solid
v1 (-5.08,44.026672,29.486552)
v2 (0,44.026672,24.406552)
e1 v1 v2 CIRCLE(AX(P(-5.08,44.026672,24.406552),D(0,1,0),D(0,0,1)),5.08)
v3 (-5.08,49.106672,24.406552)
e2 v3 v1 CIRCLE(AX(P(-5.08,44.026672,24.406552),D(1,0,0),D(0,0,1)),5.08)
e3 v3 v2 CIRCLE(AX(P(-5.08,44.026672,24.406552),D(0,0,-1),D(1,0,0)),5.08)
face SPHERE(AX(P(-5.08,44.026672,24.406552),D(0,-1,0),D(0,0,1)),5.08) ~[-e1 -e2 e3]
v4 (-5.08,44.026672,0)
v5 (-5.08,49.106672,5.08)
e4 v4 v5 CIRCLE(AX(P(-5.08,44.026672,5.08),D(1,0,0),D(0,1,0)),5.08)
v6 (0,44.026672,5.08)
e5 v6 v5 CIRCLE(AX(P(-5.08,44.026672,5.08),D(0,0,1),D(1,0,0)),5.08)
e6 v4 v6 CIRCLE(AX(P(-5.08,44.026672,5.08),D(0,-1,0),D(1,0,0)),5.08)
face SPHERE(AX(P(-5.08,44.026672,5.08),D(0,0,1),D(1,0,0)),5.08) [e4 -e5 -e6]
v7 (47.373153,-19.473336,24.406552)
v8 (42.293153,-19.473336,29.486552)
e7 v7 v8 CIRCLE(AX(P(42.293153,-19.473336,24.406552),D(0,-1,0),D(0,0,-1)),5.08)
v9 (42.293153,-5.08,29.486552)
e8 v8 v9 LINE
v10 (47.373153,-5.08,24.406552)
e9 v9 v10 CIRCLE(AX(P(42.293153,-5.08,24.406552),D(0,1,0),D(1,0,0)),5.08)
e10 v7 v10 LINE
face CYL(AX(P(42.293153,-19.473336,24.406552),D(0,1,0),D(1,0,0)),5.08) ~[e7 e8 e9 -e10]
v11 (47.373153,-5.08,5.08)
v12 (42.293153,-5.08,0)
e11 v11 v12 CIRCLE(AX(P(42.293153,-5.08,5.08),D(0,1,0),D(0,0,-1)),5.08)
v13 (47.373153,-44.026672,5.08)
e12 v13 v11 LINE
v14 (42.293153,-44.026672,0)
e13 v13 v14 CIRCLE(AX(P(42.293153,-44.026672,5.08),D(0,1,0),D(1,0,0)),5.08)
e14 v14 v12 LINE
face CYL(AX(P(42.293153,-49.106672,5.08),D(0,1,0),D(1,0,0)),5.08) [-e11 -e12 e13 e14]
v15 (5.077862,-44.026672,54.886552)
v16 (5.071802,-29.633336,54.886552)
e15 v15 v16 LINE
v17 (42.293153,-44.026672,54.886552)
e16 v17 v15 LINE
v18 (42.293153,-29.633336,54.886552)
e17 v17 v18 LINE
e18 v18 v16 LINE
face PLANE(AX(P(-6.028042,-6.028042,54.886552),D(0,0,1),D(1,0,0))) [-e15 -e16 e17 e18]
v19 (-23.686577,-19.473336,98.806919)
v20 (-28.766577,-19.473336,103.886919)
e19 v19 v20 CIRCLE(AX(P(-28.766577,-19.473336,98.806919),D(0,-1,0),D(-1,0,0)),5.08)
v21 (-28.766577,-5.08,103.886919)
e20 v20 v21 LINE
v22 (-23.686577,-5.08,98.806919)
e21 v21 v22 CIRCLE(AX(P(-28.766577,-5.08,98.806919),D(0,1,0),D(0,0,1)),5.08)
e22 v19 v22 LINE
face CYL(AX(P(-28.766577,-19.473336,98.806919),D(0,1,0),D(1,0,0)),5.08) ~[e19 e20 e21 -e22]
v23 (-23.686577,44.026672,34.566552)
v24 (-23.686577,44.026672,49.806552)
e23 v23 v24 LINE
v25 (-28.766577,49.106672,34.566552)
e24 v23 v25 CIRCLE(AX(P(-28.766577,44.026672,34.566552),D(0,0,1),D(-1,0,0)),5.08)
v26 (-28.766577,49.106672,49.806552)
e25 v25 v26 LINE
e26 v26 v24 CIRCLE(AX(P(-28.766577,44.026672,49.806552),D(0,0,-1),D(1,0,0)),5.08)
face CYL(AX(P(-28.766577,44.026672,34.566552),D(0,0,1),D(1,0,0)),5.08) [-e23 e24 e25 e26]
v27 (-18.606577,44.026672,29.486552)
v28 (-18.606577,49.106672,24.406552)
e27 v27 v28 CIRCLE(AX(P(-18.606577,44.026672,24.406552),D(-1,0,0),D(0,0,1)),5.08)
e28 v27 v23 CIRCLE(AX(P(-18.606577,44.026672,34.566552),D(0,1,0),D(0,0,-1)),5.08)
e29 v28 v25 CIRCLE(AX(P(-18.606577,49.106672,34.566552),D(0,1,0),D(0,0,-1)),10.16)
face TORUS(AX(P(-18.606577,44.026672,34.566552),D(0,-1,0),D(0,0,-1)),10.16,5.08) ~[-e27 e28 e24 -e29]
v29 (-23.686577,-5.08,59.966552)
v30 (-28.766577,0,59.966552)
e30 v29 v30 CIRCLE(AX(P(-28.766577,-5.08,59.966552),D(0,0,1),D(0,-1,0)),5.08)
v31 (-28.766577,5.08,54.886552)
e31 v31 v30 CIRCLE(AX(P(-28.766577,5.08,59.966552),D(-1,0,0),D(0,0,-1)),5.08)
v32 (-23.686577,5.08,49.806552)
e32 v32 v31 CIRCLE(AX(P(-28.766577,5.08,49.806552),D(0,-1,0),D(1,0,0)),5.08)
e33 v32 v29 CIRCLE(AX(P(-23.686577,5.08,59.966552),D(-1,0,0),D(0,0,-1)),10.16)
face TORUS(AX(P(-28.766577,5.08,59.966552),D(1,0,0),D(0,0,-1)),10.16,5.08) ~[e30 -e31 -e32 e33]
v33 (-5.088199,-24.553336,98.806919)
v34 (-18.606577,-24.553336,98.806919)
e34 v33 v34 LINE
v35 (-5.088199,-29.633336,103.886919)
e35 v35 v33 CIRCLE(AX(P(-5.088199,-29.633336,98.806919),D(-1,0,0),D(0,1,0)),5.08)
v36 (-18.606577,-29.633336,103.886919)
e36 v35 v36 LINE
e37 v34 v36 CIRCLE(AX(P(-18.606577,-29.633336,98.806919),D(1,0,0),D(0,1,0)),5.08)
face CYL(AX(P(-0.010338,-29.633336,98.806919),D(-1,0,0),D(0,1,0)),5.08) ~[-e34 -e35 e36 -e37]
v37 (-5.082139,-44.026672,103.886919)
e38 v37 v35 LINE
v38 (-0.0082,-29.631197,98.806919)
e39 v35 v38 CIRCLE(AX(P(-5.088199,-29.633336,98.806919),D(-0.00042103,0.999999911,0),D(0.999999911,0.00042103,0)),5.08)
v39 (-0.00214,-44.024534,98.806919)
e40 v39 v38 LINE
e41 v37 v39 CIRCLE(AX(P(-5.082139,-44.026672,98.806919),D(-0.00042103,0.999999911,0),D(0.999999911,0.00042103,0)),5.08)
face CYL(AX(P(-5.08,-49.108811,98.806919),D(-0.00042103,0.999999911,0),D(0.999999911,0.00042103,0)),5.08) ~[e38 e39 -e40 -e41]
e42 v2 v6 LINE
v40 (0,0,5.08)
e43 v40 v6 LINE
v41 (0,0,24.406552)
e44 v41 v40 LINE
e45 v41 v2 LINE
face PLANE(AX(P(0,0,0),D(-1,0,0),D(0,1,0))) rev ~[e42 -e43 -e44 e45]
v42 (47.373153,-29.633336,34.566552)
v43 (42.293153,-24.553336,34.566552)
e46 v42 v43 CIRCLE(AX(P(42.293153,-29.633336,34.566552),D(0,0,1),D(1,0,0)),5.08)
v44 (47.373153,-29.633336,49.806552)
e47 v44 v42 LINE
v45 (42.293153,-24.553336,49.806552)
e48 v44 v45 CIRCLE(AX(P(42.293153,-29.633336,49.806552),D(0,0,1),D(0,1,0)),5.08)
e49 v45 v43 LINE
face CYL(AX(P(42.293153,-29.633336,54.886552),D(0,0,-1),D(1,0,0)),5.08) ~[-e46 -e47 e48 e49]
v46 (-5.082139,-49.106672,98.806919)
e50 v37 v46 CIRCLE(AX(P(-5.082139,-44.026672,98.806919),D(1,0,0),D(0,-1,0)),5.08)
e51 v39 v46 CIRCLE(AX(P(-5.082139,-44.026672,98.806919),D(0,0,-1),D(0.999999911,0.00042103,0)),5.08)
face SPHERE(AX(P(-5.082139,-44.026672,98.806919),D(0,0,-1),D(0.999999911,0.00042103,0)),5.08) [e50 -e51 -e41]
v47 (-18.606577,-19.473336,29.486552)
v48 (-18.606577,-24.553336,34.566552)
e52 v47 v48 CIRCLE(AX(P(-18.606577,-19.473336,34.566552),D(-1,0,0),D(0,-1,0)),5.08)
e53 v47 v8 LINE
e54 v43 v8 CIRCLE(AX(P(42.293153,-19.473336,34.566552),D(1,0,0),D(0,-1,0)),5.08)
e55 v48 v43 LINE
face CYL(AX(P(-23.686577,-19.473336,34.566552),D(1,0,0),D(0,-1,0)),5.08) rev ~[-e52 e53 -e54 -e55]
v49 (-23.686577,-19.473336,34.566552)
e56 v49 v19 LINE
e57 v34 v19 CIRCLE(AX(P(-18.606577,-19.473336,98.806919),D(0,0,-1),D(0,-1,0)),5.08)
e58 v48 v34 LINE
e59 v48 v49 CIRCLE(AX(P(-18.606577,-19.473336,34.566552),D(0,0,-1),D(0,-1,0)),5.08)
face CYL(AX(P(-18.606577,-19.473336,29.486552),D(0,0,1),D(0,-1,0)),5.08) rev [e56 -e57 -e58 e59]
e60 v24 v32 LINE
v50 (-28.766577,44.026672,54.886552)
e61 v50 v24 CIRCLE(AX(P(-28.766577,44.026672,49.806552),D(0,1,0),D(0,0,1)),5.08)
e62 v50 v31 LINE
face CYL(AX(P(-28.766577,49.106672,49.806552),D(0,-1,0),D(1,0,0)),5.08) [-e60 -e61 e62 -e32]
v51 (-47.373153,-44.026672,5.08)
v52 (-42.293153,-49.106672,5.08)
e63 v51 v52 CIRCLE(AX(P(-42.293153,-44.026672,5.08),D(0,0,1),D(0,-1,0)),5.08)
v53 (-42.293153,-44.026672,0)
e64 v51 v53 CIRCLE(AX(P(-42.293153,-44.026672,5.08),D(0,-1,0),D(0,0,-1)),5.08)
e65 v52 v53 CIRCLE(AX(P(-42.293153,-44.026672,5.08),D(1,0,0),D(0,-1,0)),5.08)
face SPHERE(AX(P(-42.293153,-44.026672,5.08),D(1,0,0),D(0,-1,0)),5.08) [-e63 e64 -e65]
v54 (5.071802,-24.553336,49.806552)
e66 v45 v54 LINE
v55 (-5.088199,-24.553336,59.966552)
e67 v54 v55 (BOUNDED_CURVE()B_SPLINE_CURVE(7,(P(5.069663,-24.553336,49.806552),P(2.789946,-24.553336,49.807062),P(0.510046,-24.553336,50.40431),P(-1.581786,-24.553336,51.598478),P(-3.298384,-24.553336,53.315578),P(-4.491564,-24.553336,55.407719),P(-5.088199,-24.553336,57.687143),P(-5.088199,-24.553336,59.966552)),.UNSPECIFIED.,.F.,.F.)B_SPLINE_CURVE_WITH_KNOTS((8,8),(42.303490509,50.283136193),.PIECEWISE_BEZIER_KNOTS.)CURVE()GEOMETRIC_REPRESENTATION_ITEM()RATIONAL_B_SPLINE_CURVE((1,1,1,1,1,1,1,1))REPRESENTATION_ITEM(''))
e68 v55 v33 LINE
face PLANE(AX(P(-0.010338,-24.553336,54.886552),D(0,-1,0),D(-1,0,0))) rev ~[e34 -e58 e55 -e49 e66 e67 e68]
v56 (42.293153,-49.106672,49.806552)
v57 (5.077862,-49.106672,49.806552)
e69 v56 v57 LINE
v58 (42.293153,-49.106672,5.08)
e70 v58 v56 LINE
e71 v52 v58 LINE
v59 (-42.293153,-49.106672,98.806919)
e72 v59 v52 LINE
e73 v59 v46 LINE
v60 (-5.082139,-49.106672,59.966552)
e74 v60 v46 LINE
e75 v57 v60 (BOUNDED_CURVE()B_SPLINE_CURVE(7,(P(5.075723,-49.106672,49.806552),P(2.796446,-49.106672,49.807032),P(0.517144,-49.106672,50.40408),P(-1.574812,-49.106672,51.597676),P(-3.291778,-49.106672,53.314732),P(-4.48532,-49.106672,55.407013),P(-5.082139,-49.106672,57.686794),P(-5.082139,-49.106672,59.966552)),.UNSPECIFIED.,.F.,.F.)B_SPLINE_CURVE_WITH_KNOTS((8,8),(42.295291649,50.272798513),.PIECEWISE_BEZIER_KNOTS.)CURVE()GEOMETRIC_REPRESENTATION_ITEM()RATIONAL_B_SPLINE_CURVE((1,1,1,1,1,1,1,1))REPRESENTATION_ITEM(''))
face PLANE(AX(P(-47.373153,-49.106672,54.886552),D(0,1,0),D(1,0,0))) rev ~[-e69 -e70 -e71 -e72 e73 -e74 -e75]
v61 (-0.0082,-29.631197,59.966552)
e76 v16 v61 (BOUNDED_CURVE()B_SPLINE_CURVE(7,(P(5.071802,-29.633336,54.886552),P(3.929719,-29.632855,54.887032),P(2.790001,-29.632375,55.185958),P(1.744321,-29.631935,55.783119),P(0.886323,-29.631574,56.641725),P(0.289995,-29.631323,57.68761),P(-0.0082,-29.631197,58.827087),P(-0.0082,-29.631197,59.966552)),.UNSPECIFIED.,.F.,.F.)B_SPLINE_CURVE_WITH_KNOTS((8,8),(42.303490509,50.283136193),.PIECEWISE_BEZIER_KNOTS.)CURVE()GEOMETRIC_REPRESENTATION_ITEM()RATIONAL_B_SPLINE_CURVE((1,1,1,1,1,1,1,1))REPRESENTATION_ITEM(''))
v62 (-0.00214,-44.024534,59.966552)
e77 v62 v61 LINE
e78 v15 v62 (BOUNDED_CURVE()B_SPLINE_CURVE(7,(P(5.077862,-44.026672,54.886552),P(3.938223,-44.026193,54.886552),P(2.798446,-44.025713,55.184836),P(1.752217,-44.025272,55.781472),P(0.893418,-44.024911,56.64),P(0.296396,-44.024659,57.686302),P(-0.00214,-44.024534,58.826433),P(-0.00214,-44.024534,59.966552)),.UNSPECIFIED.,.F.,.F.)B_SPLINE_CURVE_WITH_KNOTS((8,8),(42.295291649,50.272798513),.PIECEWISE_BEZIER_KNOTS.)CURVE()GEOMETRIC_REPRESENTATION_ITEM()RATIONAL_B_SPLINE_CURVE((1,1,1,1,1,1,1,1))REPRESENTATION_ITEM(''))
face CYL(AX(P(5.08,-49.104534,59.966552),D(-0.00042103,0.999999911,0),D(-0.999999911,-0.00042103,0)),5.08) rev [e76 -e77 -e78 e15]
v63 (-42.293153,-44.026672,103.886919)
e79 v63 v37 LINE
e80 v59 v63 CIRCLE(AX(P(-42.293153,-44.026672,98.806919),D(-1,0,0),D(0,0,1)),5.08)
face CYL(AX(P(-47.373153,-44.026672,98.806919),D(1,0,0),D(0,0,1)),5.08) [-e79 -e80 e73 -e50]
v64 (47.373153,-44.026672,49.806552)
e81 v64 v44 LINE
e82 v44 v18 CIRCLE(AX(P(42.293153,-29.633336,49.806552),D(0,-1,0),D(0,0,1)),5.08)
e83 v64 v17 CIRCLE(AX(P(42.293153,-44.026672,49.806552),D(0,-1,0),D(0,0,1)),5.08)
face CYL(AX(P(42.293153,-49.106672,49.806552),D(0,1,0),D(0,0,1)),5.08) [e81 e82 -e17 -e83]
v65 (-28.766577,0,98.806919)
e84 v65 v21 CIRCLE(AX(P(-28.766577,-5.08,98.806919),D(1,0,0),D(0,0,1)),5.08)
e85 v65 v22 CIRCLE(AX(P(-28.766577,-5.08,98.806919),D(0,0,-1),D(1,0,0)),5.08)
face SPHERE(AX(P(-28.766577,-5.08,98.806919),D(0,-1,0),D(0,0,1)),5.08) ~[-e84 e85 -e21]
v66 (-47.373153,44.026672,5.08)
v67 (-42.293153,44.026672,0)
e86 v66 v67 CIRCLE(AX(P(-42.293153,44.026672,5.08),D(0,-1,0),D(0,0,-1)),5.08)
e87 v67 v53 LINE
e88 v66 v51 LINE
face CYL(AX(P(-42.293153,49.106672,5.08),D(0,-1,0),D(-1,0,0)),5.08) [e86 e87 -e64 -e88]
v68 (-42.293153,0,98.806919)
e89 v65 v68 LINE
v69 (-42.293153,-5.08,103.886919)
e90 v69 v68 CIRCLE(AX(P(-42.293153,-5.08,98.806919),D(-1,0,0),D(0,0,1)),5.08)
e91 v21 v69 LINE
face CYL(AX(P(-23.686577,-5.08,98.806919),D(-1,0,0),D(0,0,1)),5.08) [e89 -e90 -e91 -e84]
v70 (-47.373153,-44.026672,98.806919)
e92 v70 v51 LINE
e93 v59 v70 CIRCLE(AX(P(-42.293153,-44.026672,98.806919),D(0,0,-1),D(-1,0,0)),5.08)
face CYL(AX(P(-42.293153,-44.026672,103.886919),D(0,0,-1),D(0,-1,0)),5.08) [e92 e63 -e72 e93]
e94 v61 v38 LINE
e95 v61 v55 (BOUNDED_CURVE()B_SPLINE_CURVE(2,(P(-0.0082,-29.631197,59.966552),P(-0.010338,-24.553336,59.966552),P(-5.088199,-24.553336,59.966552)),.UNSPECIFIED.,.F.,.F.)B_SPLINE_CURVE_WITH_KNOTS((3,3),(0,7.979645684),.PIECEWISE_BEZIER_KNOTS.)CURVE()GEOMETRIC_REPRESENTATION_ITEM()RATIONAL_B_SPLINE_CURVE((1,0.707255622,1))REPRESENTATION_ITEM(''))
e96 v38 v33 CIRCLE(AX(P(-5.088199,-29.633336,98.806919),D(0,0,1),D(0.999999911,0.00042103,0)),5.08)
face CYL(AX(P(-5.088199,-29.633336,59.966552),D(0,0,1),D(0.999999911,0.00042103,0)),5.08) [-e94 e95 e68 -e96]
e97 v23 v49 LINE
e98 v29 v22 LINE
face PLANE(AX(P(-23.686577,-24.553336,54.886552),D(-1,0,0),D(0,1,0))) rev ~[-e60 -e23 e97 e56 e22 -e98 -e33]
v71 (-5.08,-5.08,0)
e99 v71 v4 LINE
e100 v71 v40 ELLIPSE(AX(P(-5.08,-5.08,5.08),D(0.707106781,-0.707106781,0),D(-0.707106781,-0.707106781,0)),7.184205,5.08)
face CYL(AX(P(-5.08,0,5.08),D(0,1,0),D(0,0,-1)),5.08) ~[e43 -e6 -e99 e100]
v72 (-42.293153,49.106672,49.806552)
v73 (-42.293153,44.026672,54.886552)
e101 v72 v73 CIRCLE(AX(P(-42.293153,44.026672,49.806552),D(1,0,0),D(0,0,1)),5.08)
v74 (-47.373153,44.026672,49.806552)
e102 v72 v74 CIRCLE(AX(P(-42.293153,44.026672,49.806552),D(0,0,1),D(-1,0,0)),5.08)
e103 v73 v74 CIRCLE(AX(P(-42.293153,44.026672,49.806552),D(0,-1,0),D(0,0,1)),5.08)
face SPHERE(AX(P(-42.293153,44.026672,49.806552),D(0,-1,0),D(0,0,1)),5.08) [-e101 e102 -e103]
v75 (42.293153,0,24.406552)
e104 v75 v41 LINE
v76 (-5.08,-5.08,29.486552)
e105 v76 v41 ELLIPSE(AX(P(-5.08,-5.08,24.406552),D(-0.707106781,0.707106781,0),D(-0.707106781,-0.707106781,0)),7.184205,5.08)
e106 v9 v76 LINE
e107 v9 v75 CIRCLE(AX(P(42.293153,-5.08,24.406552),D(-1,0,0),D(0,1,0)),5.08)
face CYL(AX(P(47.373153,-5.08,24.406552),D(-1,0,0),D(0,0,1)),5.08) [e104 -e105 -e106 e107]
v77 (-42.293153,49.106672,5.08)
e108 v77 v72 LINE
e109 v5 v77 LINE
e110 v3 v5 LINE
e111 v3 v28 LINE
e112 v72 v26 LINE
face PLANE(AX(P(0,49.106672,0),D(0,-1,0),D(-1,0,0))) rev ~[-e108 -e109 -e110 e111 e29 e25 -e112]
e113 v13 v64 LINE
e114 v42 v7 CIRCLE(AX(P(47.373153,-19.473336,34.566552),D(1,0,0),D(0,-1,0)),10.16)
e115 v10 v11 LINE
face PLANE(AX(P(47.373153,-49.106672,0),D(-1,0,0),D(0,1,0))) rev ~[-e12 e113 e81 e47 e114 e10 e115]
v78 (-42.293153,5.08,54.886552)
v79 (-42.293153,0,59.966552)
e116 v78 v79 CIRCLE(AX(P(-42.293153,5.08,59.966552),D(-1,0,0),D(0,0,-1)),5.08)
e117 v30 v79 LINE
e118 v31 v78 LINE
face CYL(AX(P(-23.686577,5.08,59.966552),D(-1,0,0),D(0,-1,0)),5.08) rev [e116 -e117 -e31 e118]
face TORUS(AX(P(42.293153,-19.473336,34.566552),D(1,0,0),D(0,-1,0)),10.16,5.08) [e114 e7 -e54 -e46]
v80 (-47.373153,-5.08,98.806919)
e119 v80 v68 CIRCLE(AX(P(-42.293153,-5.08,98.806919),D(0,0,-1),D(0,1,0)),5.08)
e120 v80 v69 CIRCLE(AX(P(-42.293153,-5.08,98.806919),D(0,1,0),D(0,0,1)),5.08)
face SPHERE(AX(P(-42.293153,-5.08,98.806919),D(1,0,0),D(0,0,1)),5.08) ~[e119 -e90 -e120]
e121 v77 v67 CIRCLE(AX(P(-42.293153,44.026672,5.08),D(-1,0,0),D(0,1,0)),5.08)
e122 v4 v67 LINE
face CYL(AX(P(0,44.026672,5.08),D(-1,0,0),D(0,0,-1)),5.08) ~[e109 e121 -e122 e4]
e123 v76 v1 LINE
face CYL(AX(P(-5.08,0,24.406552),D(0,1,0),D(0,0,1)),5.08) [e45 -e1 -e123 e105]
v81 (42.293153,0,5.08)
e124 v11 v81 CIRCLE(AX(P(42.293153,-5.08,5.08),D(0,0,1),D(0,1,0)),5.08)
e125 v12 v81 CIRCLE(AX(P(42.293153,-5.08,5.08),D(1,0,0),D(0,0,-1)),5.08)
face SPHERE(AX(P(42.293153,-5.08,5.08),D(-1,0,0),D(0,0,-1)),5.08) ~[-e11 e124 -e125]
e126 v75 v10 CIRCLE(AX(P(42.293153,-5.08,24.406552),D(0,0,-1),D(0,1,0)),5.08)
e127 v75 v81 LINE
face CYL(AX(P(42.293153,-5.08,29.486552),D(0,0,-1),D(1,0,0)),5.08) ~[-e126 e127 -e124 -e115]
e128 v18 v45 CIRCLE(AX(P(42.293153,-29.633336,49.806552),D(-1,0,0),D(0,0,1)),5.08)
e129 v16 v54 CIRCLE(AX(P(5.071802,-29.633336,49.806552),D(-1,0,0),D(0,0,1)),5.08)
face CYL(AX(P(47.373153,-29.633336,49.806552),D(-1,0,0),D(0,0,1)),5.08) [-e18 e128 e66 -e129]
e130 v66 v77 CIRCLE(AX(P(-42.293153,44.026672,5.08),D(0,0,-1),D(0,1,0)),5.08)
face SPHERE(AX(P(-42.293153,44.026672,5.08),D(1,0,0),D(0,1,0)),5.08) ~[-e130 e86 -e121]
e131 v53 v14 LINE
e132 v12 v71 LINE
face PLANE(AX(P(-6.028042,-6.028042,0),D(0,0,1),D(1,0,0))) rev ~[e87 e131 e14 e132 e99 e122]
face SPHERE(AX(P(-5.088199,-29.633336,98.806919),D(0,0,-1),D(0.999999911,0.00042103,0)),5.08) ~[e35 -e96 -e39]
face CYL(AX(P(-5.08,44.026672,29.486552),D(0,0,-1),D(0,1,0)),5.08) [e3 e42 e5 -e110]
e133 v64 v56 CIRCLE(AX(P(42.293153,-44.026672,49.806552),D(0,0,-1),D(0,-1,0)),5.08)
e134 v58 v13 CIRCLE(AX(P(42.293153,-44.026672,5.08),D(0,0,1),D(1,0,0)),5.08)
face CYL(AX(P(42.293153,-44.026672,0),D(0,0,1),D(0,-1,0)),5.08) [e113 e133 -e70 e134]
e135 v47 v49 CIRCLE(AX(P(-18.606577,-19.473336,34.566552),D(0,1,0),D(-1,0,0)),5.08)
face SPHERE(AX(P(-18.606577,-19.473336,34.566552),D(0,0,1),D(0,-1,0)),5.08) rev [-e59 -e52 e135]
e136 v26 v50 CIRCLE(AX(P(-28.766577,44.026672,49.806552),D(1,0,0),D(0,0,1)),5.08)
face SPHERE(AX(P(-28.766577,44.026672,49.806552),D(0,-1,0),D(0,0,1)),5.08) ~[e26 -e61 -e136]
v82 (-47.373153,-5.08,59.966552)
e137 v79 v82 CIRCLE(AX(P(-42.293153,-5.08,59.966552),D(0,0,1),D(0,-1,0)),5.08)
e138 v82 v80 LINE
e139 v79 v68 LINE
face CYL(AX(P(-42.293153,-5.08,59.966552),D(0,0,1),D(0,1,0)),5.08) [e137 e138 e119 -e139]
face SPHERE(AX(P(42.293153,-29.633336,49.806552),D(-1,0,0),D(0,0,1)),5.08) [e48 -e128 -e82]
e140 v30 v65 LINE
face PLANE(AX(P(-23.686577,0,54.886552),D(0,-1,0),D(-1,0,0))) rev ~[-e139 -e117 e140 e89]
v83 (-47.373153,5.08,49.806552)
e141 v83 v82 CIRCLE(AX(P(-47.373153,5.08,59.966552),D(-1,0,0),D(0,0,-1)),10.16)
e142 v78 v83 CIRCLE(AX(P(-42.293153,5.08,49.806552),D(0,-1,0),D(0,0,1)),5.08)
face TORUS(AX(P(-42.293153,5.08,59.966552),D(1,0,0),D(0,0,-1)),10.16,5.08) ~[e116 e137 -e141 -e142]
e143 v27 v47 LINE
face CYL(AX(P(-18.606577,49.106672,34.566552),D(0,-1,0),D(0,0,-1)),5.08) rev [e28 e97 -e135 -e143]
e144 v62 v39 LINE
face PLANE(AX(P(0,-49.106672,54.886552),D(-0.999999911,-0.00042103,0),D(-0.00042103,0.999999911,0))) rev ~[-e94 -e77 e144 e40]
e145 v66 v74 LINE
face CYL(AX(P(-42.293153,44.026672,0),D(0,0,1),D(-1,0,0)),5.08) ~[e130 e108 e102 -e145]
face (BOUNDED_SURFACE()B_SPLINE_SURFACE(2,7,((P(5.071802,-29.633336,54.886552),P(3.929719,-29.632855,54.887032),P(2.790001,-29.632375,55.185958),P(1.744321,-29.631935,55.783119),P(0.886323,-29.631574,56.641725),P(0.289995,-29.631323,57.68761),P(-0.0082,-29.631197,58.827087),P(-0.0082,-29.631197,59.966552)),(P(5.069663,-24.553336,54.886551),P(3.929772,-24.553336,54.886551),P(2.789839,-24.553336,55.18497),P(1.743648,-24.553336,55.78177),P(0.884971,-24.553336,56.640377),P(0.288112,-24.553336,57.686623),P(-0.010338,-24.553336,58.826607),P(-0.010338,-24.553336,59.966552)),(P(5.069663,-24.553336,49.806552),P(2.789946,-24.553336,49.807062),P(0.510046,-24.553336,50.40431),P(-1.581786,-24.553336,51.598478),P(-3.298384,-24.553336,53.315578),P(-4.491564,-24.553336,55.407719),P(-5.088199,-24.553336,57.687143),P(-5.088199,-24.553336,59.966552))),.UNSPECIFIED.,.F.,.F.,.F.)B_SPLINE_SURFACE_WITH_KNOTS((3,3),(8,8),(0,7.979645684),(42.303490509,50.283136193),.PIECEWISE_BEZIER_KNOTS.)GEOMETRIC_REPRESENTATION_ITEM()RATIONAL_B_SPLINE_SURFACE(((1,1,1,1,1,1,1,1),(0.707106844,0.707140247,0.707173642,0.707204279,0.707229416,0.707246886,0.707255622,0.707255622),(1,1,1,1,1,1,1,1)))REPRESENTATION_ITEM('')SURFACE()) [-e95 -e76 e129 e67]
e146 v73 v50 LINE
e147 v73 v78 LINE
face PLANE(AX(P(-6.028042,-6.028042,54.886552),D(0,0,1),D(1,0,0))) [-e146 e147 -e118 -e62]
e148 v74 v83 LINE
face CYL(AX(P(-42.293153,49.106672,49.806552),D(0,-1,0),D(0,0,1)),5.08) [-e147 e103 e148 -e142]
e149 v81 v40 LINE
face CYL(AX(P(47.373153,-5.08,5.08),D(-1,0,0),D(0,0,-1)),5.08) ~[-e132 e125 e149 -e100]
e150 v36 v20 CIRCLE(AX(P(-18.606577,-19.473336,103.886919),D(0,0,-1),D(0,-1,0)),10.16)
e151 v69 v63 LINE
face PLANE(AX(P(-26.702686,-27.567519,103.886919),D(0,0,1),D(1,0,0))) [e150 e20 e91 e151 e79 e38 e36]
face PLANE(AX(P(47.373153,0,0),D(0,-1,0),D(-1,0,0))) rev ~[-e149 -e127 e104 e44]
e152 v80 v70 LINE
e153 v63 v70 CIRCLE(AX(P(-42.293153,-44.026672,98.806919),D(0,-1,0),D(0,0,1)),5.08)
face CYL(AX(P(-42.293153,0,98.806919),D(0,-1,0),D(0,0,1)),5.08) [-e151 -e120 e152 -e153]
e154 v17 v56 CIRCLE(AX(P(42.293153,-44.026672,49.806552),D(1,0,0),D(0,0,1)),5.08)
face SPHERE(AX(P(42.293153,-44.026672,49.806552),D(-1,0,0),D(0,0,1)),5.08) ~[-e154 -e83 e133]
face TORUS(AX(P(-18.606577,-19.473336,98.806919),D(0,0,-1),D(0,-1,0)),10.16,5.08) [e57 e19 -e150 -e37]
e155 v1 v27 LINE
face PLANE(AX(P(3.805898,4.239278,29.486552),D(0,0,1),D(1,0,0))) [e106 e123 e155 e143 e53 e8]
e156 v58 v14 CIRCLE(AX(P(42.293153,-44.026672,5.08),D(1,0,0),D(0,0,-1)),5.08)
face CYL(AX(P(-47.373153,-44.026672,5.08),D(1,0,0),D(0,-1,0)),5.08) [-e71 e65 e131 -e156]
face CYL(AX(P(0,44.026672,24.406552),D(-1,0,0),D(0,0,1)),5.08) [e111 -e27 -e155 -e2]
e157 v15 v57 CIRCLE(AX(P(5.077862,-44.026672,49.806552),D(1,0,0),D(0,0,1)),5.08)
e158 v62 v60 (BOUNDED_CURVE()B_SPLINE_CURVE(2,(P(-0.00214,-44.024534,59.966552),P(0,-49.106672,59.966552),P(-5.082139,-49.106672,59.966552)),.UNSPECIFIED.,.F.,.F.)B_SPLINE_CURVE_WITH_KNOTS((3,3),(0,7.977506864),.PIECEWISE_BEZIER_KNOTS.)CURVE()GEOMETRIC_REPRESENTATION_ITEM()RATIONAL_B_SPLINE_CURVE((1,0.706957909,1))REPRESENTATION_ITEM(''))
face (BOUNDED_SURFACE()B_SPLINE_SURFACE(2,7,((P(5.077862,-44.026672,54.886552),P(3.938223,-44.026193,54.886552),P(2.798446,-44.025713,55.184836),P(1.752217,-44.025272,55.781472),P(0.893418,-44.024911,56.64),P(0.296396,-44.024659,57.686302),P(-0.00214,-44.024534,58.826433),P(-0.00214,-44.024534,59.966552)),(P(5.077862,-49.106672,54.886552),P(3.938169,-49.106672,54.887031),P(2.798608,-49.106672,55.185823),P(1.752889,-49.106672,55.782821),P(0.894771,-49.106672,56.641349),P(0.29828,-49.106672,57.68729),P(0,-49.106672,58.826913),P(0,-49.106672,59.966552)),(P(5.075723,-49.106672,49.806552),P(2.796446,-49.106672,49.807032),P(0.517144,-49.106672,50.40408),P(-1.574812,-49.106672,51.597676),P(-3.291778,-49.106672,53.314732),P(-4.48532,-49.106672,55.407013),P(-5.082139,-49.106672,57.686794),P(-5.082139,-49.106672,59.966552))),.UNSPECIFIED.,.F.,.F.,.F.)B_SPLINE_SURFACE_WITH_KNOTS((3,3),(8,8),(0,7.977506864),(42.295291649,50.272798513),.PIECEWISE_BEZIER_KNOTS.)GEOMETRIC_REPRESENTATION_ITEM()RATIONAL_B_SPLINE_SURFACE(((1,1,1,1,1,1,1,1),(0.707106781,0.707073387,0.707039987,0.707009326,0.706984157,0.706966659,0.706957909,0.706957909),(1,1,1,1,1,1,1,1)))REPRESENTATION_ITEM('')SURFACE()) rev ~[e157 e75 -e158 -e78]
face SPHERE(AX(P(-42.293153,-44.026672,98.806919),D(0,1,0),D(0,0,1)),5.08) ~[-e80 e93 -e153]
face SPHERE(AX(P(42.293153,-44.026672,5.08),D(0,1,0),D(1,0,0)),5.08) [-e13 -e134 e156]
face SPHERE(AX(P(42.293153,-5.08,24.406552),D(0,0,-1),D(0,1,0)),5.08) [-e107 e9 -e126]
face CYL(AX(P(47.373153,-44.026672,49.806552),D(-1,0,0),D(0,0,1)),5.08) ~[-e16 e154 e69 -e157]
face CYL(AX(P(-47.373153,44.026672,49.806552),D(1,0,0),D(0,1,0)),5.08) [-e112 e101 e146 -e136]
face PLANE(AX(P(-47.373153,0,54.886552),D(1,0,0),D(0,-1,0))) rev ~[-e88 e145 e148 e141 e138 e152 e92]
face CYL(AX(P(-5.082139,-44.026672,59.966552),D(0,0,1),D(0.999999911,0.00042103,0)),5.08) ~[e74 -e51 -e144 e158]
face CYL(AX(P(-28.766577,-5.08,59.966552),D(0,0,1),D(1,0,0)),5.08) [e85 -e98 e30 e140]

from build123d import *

# Parameters (mm, degrees)
F8_DEPTH  = 54.8865515739
F1_DEPTH  = 36.7471762002
F3_DEPTH  = 25.4
F10_DEPTH = 62.1797274798
F4_DEPTH  = 13.1793599576
F5_F1_R   = 5.08
F5_F2_R   = 5.08


with BuildPart() as f8:
    # F6 (on Top) → F8 (new body)
    with BuildSketch(Plane.XY):
        Polygon((-47.3731532693, 49.1066724062), (-47.3731532693, -49.1066724062), (47.3731532693, -49.1066724062), (47.3731532693, 0), (0, 0), (0, 49.1066724062), align=None)
    extrude(amount=F8_DEPTH)

    # F0 (on face) → F1 (join)
    with BuildSketch(Plane.XY.offset(54.8865515739)):
        Polygon((0, 49.1066724062), (-23.6865766346, 49.1066724062), (-23.6865766346, -24.5533362031), (47.3731532693, -24.5533362031), (47.3731532693, 0), (0, 0), align=None)
    extrude(amount=-F1_DEPTH)

    # F2 (on face) → F3 (cut)
    with BuildSketch(Plane.XY.offset(54.8865515739)):
        Polygon((-23.6865766346, -24.5533362031), (47.3731532693, -24.5533362031), (47.3731532693, 0), (0, 0), (0, 49.1066724062), (-23.6865766346, 49.1066724062), align=None)
    extrude(amount=-F3_DEPTH, mode=Mode.SUBTRACT)

    # F9 (on face) → F10 (join)
    with BuildSketch(Plane.XY.offset(54.8865515739)):
        Polygon((0, -49.1066724062), (-0.0103376806, -24.5533362031), (-23.6865766346, -24.5533362031), (-23.6865766346, -19.0210193396), (-23.6865766346, 0), (-47.3731532693, 0), (-47.3731532693, -11.8761584163), (-47.3731532693, -49.1066724062), align=None)
    extrude(amount=F10_DEPTH)

    # F4 (cut): a face of the model
    f4_faces = [f8.faces().sort_by_distance(p)[0] for p in [
        (-27.6363494072, -28.6452612162, 117.0662790537),
    ]]
    extrude(f4_faces, amount=-F4_DEPTH, mode=Mode.SUBTRACT)

    # F5: fillet of radius 5.08 on 32 edges, made by hand

    # F5_f1
    f5_f1_edges = [f8.edges().sort_by_distance(p)[0] for p in [
        (-23.6865766346, -24.5533362031, 66.686735335),
        (-35.529864952, 0, 54.8865515739),
        (-0.0051688403, -36.8300043046, 54.8865515739),
        (11.8432883173, -24.5533362031, 29.4865515739),
        (-23.6865766346, 12.2766681015, 29.4865515739),
    ]]
    fillet(f5_f1_edges, radius=F5_F1_R)

    # F5_f2
    f5_f2_edges = [f8.edges().sort_by_distance(p)[0] for p in [
        (-0.0051688403, -36.8300043046, 103.8869190961),
        (-9.3084571576, -24.5533362031, 103.8869190961),
        (-23.6865766346, -9.7366681015, 103.8869190961),
        (-35.529864952, 0, 103.8869190961),
        (-47.3731532693, -24.5533362031, 103.8869190961),
        (-23.6865766346, -49.1066724062, 103.8869190961),
        (-0.0103376806, -24.5533362031, 81.926735335),
        (0, -49.1066724062, 81.926735335),
        (-23.6865766346, 0, 81.926735335),
        (-47.3731532693, 0, 81.926735335),
        (47.3731532693, -36.8300043046, 54.8865515739),
        (-35.529864952, 49.1066724062, 54.8865515739),
        (23.6865766346, 0, 0),
        (47.3731532693, -24.5533362031, 0),
        (47.3731532693, 0, 14.7432757869),
        (23.6865766346, 0, 29.4865515739),
        (47.3731532693, -9.7366681015, 29.4865515739),
        (0, 24.5533362031, 29.4865515739),
        (-9.3032883173, 49.1066724062, 29.4865515739),
        (0, 49.1066724062, 14.7432757869),
        (0, 24.5533362031, 0),
        (47.3731532693, -49.1066724062, 27.4432757869),
        (0, -49.1066724062, 0),
        (-47.3731532693, -49.1066724062, 51.9434595481),
        (-23.6865766346, 49.1066724062, 0),
        (-47.3731532693, 49.1066724062, 27.4432757869),
        (-47.3731532693, 0, 0),
        (-22.1986790831, 49.1066724062, 30.9744491254),
        (47.3731532693, -23.0654386515, 30.9744491254),
        (-47.3731532693, 1.4878975516, 56.3744491254),
        (-23.6865766346, 1.4878975516, 56.3744491254),
        (1.4878976834, -49.1066724062, 56.3744491254),
        (1.4775600029, -24.5533362031, 56.3744491254),
        (-22.1986790831, -23.0654386515, 103.8869190961),
    ]]
    fillet(f5_f2_edges, radius=F5_F2_R)


solid = f8.part
